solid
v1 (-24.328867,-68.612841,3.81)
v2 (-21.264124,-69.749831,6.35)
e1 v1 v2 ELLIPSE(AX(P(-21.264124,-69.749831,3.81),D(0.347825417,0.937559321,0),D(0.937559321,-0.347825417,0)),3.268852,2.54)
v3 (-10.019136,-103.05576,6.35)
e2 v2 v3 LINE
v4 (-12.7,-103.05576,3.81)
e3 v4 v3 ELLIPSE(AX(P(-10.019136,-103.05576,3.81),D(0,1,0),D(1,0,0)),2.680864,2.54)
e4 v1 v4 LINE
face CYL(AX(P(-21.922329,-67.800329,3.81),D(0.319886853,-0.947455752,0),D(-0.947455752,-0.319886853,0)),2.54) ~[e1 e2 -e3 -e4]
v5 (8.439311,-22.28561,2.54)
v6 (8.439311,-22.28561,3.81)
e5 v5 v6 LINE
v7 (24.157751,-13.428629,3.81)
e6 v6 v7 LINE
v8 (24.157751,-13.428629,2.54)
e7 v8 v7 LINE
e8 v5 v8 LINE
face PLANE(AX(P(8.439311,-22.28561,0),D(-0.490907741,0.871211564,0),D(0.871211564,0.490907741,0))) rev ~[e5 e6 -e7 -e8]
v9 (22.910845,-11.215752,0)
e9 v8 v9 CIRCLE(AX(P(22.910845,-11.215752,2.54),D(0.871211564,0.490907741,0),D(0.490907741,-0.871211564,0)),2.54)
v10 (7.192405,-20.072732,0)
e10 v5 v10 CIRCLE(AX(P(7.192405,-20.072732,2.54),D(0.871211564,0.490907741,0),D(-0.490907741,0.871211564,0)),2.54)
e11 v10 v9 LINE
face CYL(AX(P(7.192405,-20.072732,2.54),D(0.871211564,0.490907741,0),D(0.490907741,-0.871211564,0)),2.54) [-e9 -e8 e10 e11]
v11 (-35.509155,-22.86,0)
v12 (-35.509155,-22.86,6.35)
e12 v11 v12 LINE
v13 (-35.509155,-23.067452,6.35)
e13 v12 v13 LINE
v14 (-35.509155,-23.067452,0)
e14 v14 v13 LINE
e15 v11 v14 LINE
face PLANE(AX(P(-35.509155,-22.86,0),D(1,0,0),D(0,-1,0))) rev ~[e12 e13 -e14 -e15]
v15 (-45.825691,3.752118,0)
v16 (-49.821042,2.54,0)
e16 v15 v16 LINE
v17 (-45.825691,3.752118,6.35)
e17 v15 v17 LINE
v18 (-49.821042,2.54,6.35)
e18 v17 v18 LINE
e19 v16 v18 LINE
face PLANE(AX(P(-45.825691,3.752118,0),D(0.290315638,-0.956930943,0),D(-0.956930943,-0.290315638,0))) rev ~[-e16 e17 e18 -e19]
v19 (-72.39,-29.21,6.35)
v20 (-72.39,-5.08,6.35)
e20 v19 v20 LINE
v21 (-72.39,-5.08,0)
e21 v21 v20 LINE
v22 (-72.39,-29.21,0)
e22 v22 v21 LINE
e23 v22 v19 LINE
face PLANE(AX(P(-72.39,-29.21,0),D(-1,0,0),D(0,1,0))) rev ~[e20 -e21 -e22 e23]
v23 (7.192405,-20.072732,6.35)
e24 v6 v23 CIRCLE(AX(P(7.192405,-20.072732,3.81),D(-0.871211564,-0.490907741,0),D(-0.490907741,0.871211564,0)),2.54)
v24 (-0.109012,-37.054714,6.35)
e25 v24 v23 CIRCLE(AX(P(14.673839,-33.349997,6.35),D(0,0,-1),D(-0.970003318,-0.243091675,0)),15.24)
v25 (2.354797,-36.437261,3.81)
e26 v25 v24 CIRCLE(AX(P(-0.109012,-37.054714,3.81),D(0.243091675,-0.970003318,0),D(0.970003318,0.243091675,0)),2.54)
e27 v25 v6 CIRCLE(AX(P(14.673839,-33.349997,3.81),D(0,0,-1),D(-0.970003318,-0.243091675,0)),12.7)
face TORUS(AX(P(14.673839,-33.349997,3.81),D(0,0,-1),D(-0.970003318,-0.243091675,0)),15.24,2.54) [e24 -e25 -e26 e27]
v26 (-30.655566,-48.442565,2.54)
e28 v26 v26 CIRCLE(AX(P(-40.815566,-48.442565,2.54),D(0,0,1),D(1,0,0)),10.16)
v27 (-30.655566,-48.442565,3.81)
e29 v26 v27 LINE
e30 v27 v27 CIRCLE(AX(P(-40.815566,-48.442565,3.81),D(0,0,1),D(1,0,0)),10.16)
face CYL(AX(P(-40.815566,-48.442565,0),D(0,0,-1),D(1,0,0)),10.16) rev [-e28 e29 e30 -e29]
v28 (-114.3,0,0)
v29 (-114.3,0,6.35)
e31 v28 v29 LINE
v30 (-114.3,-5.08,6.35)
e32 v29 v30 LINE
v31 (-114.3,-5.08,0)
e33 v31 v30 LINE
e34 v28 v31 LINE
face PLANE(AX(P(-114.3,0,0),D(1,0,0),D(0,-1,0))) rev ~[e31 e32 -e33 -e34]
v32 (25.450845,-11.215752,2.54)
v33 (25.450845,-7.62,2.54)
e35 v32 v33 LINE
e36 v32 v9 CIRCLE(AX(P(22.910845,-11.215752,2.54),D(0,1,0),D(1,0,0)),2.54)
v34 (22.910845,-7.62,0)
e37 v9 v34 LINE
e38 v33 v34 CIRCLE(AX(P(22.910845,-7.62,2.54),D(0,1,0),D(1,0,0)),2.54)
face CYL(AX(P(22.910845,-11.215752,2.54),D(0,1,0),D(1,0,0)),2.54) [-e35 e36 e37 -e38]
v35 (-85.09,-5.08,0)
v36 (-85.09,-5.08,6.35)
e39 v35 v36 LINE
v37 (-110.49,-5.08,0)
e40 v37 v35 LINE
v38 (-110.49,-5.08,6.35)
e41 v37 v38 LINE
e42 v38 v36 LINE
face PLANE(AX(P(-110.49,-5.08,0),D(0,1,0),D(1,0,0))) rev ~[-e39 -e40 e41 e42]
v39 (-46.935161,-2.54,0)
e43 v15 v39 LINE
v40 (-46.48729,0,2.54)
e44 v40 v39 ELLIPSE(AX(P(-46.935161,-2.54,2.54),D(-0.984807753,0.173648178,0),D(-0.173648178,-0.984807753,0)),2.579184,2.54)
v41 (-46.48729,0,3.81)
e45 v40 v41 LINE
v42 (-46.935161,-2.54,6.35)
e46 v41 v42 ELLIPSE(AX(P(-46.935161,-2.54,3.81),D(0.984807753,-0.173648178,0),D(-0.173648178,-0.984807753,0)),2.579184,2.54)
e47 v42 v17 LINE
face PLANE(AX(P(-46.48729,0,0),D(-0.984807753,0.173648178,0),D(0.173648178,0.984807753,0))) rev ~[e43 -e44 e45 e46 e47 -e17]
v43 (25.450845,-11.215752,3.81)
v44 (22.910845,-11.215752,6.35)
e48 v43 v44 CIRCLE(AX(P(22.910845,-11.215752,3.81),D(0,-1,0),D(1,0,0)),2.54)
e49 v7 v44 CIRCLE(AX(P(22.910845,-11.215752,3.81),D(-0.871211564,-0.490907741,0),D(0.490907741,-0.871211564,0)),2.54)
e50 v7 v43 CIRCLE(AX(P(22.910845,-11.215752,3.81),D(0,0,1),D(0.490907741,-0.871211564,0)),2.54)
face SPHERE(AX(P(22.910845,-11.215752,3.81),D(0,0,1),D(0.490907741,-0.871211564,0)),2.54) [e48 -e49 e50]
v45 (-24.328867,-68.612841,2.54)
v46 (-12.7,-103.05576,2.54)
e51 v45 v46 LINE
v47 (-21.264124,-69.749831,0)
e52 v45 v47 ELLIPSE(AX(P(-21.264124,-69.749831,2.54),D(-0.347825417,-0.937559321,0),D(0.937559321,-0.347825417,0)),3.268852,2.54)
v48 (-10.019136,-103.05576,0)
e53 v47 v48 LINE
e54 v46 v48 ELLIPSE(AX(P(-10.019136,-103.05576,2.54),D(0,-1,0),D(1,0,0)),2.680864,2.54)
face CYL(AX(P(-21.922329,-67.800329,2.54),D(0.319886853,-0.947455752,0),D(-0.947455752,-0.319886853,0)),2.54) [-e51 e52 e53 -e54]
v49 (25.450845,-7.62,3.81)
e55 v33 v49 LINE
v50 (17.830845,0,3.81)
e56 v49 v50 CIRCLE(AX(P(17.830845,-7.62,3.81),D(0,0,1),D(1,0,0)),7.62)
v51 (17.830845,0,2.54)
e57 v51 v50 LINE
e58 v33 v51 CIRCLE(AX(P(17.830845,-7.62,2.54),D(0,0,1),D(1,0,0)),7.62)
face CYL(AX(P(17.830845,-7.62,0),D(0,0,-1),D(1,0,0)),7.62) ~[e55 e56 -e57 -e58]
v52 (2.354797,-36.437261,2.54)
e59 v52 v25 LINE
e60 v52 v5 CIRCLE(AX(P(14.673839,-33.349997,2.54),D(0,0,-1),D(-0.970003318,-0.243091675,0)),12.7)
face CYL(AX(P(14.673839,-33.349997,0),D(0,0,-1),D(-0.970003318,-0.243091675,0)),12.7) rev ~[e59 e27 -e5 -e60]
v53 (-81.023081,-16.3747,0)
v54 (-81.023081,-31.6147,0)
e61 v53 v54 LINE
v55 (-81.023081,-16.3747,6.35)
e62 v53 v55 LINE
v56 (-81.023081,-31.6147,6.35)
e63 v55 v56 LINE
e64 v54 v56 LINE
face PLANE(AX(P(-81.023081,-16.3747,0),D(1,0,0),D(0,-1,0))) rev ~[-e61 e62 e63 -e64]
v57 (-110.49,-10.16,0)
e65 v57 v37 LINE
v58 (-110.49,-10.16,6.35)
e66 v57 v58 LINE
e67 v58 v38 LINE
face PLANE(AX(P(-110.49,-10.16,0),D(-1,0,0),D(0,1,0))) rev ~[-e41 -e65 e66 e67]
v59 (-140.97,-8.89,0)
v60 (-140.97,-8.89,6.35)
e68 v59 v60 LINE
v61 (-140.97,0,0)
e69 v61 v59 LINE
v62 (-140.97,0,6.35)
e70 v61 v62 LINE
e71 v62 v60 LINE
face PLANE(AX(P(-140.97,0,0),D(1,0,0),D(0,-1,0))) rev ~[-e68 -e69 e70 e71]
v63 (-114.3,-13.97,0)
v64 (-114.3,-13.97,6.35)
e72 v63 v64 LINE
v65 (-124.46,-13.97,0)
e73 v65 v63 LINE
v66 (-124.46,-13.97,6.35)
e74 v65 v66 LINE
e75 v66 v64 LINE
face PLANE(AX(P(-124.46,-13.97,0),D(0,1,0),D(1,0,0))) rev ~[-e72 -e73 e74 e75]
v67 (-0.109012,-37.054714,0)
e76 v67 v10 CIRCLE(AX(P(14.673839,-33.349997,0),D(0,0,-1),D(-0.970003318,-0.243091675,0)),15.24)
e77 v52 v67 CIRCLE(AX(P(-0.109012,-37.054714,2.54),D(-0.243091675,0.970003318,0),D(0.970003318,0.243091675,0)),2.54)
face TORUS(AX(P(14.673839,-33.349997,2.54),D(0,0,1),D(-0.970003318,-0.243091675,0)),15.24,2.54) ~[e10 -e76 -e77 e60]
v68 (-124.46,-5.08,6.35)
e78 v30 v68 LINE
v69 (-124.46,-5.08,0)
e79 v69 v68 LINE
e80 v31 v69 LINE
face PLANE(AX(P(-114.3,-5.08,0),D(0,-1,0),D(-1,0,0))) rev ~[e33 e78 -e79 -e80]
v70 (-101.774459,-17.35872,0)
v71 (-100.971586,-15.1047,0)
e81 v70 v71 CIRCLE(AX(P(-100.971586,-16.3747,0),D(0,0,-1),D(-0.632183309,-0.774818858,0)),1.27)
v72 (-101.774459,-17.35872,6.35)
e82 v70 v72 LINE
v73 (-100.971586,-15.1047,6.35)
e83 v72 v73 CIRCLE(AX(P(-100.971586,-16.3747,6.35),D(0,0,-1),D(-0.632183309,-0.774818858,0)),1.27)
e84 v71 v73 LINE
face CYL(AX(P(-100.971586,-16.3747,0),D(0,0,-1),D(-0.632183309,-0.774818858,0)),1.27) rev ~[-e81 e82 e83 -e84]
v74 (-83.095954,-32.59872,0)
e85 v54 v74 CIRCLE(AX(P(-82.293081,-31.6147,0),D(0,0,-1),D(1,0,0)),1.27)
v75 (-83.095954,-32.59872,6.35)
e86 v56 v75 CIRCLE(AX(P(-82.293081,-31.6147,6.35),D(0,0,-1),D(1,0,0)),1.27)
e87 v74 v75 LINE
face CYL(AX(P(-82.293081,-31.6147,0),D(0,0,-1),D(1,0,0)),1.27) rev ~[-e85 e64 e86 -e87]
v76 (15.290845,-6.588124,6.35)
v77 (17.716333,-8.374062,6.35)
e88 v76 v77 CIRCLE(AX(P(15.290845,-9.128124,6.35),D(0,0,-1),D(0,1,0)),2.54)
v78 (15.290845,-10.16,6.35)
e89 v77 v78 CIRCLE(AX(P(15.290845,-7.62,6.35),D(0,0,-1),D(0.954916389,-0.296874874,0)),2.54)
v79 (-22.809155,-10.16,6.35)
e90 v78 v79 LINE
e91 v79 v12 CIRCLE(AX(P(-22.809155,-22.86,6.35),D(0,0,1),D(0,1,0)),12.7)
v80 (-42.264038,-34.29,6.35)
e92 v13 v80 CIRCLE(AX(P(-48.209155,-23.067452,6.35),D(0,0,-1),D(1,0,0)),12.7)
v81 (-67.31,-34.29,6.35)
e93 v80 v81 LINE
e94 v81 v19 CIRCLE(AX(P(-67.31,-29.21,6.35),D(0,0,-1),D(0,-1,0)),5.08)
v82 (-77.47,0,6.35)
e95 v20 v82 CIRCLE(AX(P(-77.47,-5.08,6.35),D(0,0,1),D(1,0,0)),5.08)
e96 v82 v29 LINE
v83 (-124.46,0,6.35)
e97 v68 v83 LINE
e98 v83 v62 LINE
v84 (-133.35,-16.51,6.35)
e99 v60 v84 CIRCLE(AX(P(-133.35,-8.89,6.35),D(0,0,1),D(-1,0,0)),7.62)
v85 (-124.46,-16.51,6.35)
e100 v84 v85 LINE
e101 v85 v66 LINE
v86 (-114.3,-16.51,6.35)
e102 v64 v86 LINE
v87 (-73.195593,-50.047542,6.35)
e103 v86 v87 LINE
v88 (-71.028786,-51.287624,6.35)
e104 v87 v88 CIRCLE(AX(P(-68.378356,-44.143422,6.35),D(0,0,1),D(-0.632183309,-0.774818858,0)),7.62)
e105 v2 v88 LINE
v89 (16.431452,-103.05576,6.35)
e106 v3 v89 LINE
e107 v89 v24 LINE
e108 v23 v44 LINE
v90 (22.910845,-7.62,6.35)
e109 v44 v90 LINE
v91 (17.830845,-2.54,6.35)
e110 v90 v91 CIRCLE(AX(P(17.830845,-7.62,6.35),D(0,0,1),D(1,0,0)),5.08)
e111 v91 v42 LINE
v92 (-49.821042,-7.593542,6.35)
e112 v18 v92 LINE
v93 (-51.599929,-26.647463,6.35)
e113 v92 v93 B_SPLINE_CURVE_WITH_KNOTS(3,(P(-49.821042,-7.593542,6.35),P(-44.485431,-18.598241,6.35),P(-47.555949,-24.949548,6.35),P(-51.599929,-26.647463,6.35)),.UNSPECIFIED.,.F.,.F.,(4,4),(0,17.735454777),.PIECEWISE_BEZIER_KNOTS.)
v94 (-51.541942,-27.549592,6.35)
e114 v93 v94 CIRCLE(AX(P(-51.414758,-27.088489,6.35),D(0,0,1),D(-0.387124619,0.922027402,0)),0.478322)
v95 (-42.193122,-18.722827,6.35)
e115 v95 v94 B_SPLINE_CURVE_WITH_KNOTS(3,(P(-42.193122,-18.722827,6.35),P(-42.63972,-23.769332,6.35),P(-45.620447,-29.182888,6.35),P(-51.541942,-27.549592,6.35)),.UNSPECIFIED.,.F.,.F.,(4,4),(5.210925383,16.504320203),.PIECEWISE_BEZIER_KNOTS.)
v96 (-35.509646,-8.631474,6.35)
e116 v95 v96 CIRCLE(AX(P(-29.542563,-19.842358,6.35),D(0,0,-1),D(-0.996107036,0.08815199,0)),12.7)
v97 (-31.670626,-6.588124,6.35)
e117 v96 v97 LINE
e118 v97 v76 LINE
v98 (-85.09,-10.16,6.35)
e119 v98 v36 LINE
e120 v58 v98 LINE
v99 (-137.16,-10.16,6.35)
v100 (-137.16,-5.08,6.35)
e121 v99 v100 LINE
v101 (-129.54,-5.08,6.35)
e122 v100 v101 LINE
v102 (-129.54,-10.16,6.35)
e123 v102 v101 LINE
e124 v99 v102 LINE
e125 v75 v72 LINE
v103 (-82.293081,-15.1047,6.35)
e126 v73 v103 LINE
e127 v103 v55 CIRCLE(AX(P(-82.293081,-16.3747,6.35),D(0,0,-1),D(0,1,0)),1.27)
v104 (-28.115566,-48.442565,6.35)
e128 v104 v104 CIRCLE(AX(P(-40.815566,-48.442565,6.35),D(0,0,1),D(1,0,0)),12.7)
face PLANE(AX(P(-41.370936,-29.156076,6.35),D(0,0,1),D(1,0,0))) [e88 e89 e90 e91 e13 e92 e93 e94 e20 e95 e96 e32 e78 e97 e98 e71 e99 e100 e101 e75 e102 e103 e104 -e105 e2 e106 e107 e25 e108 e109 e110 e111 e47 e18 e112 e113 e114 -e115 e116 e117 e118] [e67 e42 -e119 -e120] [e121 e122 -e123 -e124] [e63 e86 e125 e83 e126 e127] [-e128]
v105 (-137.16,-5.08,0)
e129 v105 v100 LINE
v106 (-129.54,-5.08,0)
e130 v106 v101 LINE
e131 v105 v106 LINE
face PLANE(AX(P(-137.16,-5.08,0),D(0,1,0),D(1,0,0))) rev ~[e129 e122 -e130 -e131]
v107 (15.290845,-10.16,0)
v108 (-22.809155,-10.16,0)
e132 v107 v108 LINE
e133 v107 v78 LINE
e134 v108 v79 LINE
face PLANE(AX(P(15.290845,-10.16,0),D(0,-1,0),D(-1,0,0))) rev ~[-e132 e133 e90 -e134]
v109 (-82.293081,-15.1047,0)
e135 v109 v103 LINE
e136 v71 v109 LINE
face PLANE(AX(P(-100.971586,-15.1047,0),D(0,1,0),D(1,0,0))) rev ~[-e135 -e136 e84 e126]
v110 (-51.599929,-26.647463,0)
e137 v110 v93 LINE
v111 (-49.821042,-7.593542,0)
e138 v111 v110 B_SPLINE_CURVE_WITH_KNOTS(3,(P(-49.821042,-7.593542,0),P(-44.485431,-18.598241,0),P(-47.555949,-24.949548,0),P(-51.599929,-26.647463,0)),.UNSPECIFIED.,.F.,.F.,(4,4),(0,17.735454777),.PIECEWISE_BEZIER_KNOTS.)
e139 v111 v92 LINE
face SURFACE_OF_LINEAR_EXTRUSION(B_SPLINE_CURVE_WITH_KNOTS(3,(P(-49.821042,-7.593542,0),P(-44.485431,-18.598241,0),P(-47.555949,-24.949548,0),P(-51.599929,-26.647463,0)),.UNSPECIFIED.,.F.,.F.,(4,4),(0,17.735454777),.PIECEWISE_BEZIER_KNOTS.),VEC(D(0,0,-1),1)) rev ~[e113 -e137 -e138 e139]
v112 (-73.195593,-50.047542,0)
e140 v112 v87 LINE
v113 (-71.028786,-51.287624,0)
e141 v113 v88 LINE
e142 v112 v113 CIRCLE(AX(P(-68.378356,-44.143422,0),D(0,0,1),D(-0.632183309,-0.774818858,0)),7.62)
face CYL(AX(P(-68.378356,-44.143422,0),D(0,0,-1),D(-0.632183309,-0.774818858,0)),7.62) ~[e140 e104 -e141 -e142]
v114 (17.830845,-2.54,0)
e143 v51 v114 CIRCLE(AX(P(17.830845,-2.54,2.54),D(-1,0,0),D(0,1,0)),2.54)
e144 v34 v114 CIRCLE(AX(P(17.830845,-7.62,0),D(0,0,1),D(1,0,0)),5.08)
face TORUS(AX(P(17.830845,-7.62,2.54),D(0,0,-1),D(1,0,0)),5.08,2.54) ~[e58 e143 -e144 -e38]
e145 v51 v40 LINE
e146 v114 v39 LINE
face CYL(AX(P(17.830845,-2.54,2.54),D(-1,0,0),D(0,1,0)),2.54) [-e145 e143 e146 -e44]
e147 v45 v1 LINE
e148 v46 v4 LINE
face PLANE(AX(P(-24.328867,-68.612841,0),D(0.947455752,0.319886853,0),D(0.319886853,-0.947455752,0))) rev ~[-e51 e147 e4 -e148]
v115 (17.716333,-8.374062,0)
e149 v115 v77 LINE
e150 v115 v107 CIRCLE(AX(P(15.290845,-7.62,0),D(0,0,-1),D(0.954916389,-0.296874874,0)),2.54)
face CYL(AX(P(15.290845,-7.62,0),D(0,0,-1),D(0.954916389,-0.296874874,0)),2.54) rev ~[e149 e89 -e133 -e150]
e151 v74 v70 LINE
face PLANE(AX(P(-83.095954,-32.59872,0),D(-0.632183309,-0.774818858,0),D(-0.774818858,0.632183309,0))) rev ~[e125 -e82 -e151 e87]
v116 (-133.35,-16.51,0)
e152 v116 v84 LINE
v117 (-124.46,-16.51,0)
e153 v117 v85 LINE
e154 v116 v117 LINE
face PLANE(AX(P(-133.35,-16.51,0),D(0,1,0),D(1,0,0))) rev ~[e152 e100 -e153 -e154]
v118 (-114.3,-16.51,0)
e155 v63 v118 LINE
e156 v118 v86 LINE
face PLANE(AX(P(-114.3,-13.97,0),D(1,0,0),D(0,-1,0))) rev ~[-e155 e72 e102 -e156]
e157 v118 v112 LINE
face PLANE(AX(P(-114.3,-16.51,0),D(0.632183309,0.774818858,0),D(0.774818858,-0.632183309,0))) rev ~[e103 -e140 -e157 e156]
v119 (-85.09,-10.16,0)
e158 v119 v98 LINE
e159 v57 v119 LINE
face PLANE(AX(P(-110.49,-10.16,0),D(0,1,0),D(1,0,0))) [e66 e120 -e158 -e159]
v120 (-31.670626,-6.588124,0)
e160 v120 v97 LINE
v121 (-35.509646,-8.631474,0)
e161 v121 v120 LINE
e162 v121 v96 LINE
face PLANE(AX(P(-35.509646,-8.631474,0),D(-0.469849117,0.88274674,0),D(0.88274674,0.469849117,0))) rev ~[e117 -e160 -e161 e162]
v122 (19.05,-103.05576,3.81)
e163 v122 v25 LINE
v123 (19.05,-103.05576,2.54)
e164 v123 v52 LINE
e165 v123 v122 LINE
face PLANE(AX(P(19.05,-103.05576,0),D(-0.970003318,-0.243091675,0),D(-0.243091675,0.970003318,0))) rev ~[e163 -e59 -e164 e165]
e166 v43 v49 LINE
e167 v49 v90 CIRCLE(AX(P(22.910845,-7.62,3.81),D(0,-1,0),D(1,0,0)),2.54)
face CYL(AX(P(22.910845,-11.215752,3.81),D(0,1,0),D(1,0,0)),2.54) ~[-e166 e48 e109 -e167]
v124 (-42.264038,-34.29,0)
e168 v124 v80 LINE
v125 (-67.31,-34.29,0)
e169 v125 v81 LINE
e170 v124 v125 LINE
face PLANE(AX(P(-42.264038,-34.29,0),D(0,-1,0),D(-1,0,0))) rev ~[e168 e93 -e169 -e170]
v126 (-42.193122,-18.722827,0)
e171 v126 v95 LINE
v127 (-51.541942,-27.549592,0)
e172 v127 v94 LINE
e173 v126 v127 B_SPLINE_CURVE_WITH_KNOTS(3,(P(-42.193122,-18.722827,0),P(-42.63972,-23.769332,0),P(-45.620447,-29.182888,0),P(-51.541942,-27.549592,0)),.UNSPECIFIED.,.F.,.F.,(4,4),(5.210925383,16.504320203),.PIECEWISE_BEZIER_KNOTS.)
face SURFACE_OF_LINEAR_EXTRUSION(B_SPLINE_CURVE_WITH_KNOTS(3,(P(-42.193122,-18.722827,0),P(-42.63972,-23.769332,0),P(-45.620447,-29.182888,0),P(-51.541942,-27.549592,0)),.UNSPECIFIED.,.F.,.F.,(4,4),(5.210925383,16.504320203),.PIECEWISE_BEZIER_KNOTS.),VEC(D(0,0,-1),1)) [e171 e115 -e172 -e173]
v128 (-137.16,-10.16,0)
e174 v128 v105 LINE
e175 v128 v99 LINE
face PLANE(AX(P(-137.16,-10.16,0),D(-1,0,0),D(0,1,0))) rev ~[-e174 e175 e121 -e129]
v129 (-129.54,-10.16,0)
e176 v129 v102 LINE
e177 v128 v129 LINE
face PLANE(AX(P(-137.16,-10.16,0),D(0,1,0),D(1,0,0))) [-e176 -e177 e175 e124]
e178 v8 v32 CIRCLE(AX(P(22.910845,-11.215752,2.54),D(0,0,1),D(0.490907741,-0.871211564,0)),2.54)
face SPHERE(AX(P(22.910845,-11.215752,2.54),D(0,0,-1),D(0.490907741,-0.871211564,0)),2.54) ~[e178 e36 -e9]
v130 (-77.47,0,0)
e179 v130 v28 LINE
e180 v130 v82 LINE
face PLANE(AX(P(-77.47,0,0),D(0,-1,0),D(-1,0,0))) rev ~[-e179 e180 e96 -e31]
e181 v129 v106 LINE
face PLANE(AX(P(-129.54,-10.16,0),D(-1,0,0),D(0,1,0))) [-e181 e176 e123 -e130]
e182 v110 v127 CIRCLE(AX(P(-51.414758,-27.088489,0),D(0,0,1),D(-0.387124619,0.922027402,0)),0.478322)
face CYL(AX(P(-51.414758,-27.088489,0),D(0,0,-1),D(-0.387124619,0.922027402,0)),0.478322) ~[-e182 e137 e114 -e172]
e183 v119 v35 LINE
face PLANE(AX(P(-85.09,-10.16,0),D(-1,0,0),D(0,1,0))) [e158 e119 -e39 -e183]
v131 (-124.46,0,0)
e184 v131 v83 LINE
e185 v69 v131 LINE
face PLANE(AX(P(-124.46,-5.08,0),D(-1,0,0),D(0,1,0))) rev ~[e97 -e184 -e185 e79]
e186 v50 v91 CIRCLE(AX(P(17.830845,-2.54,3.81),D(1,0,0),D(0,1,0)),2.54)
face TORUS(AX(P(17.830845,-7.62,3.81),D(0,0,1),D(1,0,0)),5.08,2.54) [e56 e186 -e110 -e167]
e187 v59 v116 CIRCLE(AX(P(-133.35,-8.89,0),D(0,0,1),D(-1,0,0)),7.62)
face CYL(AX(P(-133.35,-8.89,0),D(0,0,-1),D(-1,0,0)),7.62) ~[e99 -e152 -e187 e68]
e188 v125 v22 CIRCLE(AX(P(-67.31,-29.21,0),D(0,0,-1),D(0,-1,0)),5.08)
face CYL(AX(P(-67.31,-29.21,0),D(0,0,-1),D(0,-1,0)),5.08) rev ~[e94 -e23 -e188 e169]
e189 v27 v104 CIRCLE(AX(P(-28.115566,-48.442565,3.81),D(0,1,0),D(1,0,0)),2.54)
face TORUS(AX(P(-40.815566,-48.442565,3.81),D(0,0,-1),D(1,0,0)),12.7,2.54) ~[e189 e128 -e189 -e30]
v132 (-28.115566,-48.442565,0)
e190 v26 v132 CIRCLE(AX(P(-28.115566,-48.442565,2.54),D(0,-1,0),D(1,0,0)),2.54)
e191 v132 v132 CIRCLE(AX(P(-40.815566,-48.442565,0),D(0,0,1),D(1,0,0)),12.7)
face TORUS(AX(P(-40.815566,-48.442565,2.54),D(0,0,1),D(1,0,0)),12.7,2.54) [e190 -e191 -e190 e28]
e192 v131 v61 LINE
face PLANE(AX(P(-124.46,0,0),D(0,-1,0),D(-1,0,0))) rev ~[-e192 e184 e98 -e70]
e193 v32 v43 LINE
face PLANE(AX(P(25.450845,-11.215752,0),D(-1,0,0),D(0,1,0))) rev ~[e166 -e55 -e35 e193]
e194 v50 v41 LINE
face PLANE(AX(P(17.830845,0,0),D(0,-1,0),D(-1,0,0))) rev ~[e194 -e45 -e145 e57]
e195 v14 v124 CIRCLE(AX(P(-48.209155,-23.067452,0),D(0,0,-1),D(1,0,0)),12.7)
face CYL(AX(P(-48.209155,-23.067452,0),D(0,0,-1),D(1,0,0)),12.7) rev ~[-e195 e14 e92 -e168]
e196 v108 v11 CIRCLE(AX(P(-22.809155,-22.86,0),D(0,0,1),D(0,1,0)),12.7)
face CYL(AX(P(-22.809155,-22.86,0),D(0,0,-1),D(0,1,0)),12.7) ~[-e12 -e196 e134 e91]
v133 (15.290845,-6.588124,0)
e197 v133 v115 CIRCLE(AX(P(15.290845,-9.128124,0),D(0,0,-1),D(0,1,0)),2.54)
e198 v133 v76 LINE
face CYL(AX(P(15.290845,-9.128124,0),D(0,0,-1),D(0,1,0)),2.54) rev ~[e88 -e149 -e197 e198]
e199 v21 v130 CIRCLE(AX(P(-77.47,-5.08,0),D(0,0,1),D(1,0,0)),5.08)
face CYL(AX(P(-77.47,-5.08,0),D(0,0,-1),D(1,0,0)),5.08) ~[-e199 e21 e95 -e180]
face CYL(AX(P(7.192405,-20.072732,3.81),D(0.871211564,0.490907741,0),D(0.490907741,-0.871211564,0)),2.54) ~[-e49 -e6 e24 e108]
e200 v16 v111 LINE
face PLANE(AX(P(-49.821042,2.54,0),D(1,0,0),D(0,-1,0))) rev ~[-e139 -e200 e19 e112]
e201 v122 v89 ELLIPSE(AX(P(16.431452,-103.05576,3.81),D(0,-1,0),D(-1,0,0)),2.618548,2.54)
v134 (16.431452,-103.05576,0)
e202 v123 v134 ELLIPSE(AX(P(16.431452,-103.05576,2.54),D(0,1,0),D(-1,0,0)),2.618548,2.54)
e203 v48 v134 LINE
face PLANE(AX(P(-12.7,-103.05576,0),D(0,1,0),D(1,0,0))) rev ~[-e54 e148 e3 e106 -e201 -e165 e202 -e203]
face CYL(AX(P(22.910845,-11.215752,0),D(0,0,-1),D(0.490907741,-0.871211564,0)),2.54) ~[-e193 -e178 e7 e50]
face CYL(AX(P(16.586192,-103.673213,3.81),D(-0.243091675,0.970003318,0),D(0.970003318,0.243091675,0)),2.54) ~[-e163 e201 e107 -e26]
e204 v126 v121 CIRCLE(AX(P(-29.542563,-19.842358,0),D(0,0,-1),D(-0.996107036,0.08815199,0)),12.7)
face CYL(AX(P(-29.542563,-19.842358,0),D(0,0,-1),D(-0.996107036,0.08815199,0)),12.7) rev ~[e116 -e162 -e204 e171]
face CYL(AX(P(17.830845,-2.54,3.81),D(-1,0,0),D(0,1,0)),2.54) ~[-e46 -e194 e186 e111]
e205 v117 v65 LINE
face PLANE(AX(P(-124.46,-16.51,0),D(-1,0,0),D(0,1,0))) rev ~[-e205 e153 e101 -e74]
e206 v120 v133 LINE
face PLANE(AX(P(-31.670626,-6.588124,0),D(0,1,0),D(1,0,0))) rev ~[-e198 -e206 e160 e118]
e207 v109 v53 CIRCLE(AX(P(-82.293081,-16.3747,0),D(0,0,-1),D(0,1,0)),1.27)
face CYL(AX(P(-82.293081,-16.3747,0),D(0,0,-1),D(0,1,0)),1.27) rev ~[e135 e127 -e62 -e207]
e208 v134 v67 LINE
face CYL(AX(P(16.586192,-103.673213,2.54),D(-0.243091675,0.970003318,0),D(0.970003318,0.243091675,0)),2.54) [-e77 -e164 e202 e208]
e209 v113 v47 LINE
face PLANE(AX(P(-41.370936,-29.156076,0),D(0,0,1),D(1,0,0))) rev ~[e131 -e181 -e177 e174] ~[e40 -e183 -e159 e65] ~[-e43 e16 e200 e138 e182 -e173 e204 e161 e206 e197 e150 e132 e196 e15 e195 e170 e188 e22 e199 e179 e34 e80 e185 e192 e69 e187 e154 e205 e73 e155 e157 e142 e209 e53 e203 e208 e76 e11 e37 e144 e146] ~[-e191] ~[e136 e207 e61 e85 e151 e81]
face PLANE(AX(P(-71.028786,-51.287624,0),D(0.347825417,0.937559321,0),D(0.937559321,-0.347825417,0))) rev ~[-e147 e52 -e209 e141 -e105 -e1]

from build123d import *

# Parameters (mm, degrees)
F0_W     = 7.62
F0_H     = 5.08
F0_W_2   = 25.4
F0_R     = 10.16
F1_DEPTH = 6.35
F2_R     = 2.54


with BuildPart() as f1:
    # F0 (on Top) → F1 (new body)
    with BuildSketch(Plane.XY):
        with BuildLine():
            Line((-31.6706262529, -6.5881243579), (15.2908454792, -6.5881243579))
            ThreePointArc((15.2908454792, -6.5881243579), (16.7968803502, -7.0827737847), (17.7163331065, -8.374062179))
            ThreePointArc((17.7163331065, -8.374062179), (16.7968803502, -9.6653505732), (15.2908454792, -10.16))
            Line((15.2908454792, -10.16), (-22.8091545208, -10.16))
            ThreePointArc((-22.8091545208, -10.16), (-31.7894106419, -13.8797438789), (-35.5091545208, -22.86))
            Line((-35.5091545208, -22.86), (-35.5091545208, -23.067451765))
            ThreePointArc((-35.5091545208, -23.067451765), (-37.3281393906, -29.6167654494), (-42.2640379439, -34.29))
            Line((-42.2640379439, -34.29), (-67.31, -34.29))
            ThreePointArc((-67.31, -34.29), (-70.9021024484, -32.8021024484), (-72.39, -29.21))
            Line((-72.39, -29.21), (-72.39, -5.08))
            ThreePointArc((-72.39, -5.08), (-73.8778975516, -1.4878975516), (-77.47, 0))
            Line((-77.47, 0), (-114.3, 0))
            Line((-114.3, 0), (-114.3, -5.08))
            Line((-114.3, -5.08), (-124.46, -5.08))
            Line((-124.46, -5.08), (-124.46, 0))
            Line((-124.46, 0), (-140.97, 0))
            Line((-140.97, 0), (-140.97, -8.89))
            ThreePointArc((-140.97, -8.89), (-138.7381536726, -14.2781536726), (-133.35, -16.51))
            Line((-133.35, -16.51), (-124.46, -16.51))
            Line((-124.46, -16.51), (-124.46, -13.97))
            Line((-124.46, -13.97), (-114.3, -13.97))
            Line((-114.3, -13.97), (-114.3, -16.51))
            Line((-114.3, -16.51), (-73.1955929906, -50.0475420508))
            ThreePointArc((-73.1955929906, -50.0475420508), (-72.1633213981, -50.756926583), (-71.0287858488, -51.2876243715))
            Line((-71.0287858488, -51.2876243715), (-24.3288669735, -68.6128414369))
            Line((-24.3288669735, -68.6128414369), (-12.7, -103.0557602644))
            Line((-12.7, -103.0557602644), (19.05, -103.0557602644))
            Line((19.05, -103.0557602644), (2.3547967276, -36.4372610145))
            ThreePointArc((2.3547967276, -36.4372610145), (3.0065319132, -28.3336286948), (8.4393105622, -22.2856098724))
            Line((8.4393105622, -22.2856098724), (24.1577511408, -13.4286290107))
            ThreePointArc((24.1577511408, -13.4286290107), (25.1038731102, -12.4972467832), (25.4508454792, -11.2157516369))
            Line((25.4508454792, -11.2157516369), (25.4508454792, -7.62))
            ThreePointArc((25.4508454792, -7.62), (23.2189991518, -2.2318463274), (17.8308454792, 0))
            Line((17.8308454792, 0), (12.0385419577, 0))
            Line((12.0385419577, 0), (-46.4872904122, 0))
            Line((-46.4872904122, 0), (-45.8256908553, 3.752117539))
            Line((-45.8256908553, 3.752117539), (-49.8210415244, 2.54))
            Line((-49.8210415244, 2.54), (-49.8210415244, 0))
            Line((-49.8210415244, 0), (-49.8210415244, -7.5935418718))
            add(Edge.make_bspline(
                [(-49.8210415244, -7.5935418718), (-44.485431179, -18.5982405148), (-47.5559489311, -24.9495477887), (-51.5999285014, -26.6474626741)],
                knots=[0, 0, 0, 0, 17.7354547772, 17.7354547772, 17.7354547772, 17.7354547772], degree=3))
            ThreePointArc((-51.5999285014, -26.6474626741), (-51.8920952454, -27.1191706564), (-51.5419420272, -27.5495920205))
            add(Edge.make_bspline(
                [(-42.1931219537, -18.7228273079), (-42.6397200116, -23.7693324215), (-45.6204470158, -29.1828876463), (-51.5419420272, -27.5495920205)],
                knots=[5.2109253832, 5.2109253832, 5.2109253832, 5.2109253832, 16.5043202027, 16.5043202027, 16.5043202027, 16.5043202027], degree=3))
            ThreePointArc((-42.1931219537, -18.7228273079), (-40.130905812, -12.8297269732), (-35.5096463796, -8.6314739761))
            Line((-35.5096463796, -8.6314739761), (-31.6706262529, -6.5881243579))
        make_face()
        with BuildLine():
            Line((-83.0959535938, -32.5987200656), (-101.7744590691, -17.3587200656))
            ThreePointArc((-101.7744590691, -17.3587200656), (-102.1679568897, -15.9485577312), (-100.9715862663, -15.1047001153))
            Line((-100.9715862663, -15.1047001153), (-82.2930807911, -15.1047001153))
            ThreePointArc((-82.2930807911, -15.1047001153), (-81.3950551789, -15.4766745032), (-81.0230807911, -16.3747001153))
            Line((-81.0230807911, -16.3747001153), (-81.0230807911, -31.6147001153))
            ThreePointArc((-81.0230807911, -31.6147001153), (-81.74844718, -32.7619900655), (-83.0959535938, -32.5987200656))
        make_face(mode=Mode.SUBTRACT)
        with Locations((-133.35, -7.62)):
            Rectangle(F0_W, F0_H, mode=Mode.SUBTRACT)
        with Locations((-97.79, -7.62)):
            Rectangle(F0_W_2, F0_H, mode=Mode.SUBTRACT)
        with Locations((-40.8155657351, -48.4425649047)):
            Circle(F0_R, mode=Mode.SUBTRACT)
        with BuildLine():
            ThreePointArc((17.8308454792, -9.1281243579), (17.8020542094, -8.7467705677), (17.7163331065, -8.374062179))
            ThreePointArc((17.7163331065, -8.374062179), (17.8020542094, -8.0013537902), (17.8308454792, -7.62))
            Line((17.8308454792, -7.62), (17.8308454792, -9.1281243579))
        make_face(mode=Mode.SUBTRACT)
        with BuildLine():
            ThreePointArc((17.8308454792, -7.62), (17.8020542094, -8.0013537902), (17.7163331065, -8.374062179))
            ThreePointArc((17.7163331065, -8.374062179), (17.8020542094, -8.7467705677), (17.8308454792, -9.1281243579))
            Line((17.8308454792, -9.1281243579), (17.8308454792, -7.62))
        make_face()
    extrude(amount=F1_DEPTH)

    # F2
    f2_edges = [f1.edges().sort_by_distance(p)[0] for p in [
        (-18.514433, -85.834301, 6.35),
        (-18.514433, -85.834301, 0),
        (-50.975566, -48.442565, 6.35),
        (-50.975566, -48.442565, 0),
        (10.702398, -69.746511, 6.35),
        (10.702398, -69.746511, 0),
        (3.006532, -28.333629, 0),
        (3.006532, -28.333629, 6.35),
        (16.298531, -17.857119, 0),
        (16.298531, -17.857119, 6.35),
        (25.103873, -12.497247, 0),
        (25.103873, -12.497247, 6.35),
        (25.450845, -9.417876, 0),
        (25.450845, -9.417876, 6.35),
        (23.218999, -2.231846, 0),
        (23.218999, -2.231846, 6.35),
        (-14.328222, 0, 0),
        (-14.328222, 0, 6.35),
    ]]
    fillet(f2_edges, radius=F2_R)


solid = f1.part
